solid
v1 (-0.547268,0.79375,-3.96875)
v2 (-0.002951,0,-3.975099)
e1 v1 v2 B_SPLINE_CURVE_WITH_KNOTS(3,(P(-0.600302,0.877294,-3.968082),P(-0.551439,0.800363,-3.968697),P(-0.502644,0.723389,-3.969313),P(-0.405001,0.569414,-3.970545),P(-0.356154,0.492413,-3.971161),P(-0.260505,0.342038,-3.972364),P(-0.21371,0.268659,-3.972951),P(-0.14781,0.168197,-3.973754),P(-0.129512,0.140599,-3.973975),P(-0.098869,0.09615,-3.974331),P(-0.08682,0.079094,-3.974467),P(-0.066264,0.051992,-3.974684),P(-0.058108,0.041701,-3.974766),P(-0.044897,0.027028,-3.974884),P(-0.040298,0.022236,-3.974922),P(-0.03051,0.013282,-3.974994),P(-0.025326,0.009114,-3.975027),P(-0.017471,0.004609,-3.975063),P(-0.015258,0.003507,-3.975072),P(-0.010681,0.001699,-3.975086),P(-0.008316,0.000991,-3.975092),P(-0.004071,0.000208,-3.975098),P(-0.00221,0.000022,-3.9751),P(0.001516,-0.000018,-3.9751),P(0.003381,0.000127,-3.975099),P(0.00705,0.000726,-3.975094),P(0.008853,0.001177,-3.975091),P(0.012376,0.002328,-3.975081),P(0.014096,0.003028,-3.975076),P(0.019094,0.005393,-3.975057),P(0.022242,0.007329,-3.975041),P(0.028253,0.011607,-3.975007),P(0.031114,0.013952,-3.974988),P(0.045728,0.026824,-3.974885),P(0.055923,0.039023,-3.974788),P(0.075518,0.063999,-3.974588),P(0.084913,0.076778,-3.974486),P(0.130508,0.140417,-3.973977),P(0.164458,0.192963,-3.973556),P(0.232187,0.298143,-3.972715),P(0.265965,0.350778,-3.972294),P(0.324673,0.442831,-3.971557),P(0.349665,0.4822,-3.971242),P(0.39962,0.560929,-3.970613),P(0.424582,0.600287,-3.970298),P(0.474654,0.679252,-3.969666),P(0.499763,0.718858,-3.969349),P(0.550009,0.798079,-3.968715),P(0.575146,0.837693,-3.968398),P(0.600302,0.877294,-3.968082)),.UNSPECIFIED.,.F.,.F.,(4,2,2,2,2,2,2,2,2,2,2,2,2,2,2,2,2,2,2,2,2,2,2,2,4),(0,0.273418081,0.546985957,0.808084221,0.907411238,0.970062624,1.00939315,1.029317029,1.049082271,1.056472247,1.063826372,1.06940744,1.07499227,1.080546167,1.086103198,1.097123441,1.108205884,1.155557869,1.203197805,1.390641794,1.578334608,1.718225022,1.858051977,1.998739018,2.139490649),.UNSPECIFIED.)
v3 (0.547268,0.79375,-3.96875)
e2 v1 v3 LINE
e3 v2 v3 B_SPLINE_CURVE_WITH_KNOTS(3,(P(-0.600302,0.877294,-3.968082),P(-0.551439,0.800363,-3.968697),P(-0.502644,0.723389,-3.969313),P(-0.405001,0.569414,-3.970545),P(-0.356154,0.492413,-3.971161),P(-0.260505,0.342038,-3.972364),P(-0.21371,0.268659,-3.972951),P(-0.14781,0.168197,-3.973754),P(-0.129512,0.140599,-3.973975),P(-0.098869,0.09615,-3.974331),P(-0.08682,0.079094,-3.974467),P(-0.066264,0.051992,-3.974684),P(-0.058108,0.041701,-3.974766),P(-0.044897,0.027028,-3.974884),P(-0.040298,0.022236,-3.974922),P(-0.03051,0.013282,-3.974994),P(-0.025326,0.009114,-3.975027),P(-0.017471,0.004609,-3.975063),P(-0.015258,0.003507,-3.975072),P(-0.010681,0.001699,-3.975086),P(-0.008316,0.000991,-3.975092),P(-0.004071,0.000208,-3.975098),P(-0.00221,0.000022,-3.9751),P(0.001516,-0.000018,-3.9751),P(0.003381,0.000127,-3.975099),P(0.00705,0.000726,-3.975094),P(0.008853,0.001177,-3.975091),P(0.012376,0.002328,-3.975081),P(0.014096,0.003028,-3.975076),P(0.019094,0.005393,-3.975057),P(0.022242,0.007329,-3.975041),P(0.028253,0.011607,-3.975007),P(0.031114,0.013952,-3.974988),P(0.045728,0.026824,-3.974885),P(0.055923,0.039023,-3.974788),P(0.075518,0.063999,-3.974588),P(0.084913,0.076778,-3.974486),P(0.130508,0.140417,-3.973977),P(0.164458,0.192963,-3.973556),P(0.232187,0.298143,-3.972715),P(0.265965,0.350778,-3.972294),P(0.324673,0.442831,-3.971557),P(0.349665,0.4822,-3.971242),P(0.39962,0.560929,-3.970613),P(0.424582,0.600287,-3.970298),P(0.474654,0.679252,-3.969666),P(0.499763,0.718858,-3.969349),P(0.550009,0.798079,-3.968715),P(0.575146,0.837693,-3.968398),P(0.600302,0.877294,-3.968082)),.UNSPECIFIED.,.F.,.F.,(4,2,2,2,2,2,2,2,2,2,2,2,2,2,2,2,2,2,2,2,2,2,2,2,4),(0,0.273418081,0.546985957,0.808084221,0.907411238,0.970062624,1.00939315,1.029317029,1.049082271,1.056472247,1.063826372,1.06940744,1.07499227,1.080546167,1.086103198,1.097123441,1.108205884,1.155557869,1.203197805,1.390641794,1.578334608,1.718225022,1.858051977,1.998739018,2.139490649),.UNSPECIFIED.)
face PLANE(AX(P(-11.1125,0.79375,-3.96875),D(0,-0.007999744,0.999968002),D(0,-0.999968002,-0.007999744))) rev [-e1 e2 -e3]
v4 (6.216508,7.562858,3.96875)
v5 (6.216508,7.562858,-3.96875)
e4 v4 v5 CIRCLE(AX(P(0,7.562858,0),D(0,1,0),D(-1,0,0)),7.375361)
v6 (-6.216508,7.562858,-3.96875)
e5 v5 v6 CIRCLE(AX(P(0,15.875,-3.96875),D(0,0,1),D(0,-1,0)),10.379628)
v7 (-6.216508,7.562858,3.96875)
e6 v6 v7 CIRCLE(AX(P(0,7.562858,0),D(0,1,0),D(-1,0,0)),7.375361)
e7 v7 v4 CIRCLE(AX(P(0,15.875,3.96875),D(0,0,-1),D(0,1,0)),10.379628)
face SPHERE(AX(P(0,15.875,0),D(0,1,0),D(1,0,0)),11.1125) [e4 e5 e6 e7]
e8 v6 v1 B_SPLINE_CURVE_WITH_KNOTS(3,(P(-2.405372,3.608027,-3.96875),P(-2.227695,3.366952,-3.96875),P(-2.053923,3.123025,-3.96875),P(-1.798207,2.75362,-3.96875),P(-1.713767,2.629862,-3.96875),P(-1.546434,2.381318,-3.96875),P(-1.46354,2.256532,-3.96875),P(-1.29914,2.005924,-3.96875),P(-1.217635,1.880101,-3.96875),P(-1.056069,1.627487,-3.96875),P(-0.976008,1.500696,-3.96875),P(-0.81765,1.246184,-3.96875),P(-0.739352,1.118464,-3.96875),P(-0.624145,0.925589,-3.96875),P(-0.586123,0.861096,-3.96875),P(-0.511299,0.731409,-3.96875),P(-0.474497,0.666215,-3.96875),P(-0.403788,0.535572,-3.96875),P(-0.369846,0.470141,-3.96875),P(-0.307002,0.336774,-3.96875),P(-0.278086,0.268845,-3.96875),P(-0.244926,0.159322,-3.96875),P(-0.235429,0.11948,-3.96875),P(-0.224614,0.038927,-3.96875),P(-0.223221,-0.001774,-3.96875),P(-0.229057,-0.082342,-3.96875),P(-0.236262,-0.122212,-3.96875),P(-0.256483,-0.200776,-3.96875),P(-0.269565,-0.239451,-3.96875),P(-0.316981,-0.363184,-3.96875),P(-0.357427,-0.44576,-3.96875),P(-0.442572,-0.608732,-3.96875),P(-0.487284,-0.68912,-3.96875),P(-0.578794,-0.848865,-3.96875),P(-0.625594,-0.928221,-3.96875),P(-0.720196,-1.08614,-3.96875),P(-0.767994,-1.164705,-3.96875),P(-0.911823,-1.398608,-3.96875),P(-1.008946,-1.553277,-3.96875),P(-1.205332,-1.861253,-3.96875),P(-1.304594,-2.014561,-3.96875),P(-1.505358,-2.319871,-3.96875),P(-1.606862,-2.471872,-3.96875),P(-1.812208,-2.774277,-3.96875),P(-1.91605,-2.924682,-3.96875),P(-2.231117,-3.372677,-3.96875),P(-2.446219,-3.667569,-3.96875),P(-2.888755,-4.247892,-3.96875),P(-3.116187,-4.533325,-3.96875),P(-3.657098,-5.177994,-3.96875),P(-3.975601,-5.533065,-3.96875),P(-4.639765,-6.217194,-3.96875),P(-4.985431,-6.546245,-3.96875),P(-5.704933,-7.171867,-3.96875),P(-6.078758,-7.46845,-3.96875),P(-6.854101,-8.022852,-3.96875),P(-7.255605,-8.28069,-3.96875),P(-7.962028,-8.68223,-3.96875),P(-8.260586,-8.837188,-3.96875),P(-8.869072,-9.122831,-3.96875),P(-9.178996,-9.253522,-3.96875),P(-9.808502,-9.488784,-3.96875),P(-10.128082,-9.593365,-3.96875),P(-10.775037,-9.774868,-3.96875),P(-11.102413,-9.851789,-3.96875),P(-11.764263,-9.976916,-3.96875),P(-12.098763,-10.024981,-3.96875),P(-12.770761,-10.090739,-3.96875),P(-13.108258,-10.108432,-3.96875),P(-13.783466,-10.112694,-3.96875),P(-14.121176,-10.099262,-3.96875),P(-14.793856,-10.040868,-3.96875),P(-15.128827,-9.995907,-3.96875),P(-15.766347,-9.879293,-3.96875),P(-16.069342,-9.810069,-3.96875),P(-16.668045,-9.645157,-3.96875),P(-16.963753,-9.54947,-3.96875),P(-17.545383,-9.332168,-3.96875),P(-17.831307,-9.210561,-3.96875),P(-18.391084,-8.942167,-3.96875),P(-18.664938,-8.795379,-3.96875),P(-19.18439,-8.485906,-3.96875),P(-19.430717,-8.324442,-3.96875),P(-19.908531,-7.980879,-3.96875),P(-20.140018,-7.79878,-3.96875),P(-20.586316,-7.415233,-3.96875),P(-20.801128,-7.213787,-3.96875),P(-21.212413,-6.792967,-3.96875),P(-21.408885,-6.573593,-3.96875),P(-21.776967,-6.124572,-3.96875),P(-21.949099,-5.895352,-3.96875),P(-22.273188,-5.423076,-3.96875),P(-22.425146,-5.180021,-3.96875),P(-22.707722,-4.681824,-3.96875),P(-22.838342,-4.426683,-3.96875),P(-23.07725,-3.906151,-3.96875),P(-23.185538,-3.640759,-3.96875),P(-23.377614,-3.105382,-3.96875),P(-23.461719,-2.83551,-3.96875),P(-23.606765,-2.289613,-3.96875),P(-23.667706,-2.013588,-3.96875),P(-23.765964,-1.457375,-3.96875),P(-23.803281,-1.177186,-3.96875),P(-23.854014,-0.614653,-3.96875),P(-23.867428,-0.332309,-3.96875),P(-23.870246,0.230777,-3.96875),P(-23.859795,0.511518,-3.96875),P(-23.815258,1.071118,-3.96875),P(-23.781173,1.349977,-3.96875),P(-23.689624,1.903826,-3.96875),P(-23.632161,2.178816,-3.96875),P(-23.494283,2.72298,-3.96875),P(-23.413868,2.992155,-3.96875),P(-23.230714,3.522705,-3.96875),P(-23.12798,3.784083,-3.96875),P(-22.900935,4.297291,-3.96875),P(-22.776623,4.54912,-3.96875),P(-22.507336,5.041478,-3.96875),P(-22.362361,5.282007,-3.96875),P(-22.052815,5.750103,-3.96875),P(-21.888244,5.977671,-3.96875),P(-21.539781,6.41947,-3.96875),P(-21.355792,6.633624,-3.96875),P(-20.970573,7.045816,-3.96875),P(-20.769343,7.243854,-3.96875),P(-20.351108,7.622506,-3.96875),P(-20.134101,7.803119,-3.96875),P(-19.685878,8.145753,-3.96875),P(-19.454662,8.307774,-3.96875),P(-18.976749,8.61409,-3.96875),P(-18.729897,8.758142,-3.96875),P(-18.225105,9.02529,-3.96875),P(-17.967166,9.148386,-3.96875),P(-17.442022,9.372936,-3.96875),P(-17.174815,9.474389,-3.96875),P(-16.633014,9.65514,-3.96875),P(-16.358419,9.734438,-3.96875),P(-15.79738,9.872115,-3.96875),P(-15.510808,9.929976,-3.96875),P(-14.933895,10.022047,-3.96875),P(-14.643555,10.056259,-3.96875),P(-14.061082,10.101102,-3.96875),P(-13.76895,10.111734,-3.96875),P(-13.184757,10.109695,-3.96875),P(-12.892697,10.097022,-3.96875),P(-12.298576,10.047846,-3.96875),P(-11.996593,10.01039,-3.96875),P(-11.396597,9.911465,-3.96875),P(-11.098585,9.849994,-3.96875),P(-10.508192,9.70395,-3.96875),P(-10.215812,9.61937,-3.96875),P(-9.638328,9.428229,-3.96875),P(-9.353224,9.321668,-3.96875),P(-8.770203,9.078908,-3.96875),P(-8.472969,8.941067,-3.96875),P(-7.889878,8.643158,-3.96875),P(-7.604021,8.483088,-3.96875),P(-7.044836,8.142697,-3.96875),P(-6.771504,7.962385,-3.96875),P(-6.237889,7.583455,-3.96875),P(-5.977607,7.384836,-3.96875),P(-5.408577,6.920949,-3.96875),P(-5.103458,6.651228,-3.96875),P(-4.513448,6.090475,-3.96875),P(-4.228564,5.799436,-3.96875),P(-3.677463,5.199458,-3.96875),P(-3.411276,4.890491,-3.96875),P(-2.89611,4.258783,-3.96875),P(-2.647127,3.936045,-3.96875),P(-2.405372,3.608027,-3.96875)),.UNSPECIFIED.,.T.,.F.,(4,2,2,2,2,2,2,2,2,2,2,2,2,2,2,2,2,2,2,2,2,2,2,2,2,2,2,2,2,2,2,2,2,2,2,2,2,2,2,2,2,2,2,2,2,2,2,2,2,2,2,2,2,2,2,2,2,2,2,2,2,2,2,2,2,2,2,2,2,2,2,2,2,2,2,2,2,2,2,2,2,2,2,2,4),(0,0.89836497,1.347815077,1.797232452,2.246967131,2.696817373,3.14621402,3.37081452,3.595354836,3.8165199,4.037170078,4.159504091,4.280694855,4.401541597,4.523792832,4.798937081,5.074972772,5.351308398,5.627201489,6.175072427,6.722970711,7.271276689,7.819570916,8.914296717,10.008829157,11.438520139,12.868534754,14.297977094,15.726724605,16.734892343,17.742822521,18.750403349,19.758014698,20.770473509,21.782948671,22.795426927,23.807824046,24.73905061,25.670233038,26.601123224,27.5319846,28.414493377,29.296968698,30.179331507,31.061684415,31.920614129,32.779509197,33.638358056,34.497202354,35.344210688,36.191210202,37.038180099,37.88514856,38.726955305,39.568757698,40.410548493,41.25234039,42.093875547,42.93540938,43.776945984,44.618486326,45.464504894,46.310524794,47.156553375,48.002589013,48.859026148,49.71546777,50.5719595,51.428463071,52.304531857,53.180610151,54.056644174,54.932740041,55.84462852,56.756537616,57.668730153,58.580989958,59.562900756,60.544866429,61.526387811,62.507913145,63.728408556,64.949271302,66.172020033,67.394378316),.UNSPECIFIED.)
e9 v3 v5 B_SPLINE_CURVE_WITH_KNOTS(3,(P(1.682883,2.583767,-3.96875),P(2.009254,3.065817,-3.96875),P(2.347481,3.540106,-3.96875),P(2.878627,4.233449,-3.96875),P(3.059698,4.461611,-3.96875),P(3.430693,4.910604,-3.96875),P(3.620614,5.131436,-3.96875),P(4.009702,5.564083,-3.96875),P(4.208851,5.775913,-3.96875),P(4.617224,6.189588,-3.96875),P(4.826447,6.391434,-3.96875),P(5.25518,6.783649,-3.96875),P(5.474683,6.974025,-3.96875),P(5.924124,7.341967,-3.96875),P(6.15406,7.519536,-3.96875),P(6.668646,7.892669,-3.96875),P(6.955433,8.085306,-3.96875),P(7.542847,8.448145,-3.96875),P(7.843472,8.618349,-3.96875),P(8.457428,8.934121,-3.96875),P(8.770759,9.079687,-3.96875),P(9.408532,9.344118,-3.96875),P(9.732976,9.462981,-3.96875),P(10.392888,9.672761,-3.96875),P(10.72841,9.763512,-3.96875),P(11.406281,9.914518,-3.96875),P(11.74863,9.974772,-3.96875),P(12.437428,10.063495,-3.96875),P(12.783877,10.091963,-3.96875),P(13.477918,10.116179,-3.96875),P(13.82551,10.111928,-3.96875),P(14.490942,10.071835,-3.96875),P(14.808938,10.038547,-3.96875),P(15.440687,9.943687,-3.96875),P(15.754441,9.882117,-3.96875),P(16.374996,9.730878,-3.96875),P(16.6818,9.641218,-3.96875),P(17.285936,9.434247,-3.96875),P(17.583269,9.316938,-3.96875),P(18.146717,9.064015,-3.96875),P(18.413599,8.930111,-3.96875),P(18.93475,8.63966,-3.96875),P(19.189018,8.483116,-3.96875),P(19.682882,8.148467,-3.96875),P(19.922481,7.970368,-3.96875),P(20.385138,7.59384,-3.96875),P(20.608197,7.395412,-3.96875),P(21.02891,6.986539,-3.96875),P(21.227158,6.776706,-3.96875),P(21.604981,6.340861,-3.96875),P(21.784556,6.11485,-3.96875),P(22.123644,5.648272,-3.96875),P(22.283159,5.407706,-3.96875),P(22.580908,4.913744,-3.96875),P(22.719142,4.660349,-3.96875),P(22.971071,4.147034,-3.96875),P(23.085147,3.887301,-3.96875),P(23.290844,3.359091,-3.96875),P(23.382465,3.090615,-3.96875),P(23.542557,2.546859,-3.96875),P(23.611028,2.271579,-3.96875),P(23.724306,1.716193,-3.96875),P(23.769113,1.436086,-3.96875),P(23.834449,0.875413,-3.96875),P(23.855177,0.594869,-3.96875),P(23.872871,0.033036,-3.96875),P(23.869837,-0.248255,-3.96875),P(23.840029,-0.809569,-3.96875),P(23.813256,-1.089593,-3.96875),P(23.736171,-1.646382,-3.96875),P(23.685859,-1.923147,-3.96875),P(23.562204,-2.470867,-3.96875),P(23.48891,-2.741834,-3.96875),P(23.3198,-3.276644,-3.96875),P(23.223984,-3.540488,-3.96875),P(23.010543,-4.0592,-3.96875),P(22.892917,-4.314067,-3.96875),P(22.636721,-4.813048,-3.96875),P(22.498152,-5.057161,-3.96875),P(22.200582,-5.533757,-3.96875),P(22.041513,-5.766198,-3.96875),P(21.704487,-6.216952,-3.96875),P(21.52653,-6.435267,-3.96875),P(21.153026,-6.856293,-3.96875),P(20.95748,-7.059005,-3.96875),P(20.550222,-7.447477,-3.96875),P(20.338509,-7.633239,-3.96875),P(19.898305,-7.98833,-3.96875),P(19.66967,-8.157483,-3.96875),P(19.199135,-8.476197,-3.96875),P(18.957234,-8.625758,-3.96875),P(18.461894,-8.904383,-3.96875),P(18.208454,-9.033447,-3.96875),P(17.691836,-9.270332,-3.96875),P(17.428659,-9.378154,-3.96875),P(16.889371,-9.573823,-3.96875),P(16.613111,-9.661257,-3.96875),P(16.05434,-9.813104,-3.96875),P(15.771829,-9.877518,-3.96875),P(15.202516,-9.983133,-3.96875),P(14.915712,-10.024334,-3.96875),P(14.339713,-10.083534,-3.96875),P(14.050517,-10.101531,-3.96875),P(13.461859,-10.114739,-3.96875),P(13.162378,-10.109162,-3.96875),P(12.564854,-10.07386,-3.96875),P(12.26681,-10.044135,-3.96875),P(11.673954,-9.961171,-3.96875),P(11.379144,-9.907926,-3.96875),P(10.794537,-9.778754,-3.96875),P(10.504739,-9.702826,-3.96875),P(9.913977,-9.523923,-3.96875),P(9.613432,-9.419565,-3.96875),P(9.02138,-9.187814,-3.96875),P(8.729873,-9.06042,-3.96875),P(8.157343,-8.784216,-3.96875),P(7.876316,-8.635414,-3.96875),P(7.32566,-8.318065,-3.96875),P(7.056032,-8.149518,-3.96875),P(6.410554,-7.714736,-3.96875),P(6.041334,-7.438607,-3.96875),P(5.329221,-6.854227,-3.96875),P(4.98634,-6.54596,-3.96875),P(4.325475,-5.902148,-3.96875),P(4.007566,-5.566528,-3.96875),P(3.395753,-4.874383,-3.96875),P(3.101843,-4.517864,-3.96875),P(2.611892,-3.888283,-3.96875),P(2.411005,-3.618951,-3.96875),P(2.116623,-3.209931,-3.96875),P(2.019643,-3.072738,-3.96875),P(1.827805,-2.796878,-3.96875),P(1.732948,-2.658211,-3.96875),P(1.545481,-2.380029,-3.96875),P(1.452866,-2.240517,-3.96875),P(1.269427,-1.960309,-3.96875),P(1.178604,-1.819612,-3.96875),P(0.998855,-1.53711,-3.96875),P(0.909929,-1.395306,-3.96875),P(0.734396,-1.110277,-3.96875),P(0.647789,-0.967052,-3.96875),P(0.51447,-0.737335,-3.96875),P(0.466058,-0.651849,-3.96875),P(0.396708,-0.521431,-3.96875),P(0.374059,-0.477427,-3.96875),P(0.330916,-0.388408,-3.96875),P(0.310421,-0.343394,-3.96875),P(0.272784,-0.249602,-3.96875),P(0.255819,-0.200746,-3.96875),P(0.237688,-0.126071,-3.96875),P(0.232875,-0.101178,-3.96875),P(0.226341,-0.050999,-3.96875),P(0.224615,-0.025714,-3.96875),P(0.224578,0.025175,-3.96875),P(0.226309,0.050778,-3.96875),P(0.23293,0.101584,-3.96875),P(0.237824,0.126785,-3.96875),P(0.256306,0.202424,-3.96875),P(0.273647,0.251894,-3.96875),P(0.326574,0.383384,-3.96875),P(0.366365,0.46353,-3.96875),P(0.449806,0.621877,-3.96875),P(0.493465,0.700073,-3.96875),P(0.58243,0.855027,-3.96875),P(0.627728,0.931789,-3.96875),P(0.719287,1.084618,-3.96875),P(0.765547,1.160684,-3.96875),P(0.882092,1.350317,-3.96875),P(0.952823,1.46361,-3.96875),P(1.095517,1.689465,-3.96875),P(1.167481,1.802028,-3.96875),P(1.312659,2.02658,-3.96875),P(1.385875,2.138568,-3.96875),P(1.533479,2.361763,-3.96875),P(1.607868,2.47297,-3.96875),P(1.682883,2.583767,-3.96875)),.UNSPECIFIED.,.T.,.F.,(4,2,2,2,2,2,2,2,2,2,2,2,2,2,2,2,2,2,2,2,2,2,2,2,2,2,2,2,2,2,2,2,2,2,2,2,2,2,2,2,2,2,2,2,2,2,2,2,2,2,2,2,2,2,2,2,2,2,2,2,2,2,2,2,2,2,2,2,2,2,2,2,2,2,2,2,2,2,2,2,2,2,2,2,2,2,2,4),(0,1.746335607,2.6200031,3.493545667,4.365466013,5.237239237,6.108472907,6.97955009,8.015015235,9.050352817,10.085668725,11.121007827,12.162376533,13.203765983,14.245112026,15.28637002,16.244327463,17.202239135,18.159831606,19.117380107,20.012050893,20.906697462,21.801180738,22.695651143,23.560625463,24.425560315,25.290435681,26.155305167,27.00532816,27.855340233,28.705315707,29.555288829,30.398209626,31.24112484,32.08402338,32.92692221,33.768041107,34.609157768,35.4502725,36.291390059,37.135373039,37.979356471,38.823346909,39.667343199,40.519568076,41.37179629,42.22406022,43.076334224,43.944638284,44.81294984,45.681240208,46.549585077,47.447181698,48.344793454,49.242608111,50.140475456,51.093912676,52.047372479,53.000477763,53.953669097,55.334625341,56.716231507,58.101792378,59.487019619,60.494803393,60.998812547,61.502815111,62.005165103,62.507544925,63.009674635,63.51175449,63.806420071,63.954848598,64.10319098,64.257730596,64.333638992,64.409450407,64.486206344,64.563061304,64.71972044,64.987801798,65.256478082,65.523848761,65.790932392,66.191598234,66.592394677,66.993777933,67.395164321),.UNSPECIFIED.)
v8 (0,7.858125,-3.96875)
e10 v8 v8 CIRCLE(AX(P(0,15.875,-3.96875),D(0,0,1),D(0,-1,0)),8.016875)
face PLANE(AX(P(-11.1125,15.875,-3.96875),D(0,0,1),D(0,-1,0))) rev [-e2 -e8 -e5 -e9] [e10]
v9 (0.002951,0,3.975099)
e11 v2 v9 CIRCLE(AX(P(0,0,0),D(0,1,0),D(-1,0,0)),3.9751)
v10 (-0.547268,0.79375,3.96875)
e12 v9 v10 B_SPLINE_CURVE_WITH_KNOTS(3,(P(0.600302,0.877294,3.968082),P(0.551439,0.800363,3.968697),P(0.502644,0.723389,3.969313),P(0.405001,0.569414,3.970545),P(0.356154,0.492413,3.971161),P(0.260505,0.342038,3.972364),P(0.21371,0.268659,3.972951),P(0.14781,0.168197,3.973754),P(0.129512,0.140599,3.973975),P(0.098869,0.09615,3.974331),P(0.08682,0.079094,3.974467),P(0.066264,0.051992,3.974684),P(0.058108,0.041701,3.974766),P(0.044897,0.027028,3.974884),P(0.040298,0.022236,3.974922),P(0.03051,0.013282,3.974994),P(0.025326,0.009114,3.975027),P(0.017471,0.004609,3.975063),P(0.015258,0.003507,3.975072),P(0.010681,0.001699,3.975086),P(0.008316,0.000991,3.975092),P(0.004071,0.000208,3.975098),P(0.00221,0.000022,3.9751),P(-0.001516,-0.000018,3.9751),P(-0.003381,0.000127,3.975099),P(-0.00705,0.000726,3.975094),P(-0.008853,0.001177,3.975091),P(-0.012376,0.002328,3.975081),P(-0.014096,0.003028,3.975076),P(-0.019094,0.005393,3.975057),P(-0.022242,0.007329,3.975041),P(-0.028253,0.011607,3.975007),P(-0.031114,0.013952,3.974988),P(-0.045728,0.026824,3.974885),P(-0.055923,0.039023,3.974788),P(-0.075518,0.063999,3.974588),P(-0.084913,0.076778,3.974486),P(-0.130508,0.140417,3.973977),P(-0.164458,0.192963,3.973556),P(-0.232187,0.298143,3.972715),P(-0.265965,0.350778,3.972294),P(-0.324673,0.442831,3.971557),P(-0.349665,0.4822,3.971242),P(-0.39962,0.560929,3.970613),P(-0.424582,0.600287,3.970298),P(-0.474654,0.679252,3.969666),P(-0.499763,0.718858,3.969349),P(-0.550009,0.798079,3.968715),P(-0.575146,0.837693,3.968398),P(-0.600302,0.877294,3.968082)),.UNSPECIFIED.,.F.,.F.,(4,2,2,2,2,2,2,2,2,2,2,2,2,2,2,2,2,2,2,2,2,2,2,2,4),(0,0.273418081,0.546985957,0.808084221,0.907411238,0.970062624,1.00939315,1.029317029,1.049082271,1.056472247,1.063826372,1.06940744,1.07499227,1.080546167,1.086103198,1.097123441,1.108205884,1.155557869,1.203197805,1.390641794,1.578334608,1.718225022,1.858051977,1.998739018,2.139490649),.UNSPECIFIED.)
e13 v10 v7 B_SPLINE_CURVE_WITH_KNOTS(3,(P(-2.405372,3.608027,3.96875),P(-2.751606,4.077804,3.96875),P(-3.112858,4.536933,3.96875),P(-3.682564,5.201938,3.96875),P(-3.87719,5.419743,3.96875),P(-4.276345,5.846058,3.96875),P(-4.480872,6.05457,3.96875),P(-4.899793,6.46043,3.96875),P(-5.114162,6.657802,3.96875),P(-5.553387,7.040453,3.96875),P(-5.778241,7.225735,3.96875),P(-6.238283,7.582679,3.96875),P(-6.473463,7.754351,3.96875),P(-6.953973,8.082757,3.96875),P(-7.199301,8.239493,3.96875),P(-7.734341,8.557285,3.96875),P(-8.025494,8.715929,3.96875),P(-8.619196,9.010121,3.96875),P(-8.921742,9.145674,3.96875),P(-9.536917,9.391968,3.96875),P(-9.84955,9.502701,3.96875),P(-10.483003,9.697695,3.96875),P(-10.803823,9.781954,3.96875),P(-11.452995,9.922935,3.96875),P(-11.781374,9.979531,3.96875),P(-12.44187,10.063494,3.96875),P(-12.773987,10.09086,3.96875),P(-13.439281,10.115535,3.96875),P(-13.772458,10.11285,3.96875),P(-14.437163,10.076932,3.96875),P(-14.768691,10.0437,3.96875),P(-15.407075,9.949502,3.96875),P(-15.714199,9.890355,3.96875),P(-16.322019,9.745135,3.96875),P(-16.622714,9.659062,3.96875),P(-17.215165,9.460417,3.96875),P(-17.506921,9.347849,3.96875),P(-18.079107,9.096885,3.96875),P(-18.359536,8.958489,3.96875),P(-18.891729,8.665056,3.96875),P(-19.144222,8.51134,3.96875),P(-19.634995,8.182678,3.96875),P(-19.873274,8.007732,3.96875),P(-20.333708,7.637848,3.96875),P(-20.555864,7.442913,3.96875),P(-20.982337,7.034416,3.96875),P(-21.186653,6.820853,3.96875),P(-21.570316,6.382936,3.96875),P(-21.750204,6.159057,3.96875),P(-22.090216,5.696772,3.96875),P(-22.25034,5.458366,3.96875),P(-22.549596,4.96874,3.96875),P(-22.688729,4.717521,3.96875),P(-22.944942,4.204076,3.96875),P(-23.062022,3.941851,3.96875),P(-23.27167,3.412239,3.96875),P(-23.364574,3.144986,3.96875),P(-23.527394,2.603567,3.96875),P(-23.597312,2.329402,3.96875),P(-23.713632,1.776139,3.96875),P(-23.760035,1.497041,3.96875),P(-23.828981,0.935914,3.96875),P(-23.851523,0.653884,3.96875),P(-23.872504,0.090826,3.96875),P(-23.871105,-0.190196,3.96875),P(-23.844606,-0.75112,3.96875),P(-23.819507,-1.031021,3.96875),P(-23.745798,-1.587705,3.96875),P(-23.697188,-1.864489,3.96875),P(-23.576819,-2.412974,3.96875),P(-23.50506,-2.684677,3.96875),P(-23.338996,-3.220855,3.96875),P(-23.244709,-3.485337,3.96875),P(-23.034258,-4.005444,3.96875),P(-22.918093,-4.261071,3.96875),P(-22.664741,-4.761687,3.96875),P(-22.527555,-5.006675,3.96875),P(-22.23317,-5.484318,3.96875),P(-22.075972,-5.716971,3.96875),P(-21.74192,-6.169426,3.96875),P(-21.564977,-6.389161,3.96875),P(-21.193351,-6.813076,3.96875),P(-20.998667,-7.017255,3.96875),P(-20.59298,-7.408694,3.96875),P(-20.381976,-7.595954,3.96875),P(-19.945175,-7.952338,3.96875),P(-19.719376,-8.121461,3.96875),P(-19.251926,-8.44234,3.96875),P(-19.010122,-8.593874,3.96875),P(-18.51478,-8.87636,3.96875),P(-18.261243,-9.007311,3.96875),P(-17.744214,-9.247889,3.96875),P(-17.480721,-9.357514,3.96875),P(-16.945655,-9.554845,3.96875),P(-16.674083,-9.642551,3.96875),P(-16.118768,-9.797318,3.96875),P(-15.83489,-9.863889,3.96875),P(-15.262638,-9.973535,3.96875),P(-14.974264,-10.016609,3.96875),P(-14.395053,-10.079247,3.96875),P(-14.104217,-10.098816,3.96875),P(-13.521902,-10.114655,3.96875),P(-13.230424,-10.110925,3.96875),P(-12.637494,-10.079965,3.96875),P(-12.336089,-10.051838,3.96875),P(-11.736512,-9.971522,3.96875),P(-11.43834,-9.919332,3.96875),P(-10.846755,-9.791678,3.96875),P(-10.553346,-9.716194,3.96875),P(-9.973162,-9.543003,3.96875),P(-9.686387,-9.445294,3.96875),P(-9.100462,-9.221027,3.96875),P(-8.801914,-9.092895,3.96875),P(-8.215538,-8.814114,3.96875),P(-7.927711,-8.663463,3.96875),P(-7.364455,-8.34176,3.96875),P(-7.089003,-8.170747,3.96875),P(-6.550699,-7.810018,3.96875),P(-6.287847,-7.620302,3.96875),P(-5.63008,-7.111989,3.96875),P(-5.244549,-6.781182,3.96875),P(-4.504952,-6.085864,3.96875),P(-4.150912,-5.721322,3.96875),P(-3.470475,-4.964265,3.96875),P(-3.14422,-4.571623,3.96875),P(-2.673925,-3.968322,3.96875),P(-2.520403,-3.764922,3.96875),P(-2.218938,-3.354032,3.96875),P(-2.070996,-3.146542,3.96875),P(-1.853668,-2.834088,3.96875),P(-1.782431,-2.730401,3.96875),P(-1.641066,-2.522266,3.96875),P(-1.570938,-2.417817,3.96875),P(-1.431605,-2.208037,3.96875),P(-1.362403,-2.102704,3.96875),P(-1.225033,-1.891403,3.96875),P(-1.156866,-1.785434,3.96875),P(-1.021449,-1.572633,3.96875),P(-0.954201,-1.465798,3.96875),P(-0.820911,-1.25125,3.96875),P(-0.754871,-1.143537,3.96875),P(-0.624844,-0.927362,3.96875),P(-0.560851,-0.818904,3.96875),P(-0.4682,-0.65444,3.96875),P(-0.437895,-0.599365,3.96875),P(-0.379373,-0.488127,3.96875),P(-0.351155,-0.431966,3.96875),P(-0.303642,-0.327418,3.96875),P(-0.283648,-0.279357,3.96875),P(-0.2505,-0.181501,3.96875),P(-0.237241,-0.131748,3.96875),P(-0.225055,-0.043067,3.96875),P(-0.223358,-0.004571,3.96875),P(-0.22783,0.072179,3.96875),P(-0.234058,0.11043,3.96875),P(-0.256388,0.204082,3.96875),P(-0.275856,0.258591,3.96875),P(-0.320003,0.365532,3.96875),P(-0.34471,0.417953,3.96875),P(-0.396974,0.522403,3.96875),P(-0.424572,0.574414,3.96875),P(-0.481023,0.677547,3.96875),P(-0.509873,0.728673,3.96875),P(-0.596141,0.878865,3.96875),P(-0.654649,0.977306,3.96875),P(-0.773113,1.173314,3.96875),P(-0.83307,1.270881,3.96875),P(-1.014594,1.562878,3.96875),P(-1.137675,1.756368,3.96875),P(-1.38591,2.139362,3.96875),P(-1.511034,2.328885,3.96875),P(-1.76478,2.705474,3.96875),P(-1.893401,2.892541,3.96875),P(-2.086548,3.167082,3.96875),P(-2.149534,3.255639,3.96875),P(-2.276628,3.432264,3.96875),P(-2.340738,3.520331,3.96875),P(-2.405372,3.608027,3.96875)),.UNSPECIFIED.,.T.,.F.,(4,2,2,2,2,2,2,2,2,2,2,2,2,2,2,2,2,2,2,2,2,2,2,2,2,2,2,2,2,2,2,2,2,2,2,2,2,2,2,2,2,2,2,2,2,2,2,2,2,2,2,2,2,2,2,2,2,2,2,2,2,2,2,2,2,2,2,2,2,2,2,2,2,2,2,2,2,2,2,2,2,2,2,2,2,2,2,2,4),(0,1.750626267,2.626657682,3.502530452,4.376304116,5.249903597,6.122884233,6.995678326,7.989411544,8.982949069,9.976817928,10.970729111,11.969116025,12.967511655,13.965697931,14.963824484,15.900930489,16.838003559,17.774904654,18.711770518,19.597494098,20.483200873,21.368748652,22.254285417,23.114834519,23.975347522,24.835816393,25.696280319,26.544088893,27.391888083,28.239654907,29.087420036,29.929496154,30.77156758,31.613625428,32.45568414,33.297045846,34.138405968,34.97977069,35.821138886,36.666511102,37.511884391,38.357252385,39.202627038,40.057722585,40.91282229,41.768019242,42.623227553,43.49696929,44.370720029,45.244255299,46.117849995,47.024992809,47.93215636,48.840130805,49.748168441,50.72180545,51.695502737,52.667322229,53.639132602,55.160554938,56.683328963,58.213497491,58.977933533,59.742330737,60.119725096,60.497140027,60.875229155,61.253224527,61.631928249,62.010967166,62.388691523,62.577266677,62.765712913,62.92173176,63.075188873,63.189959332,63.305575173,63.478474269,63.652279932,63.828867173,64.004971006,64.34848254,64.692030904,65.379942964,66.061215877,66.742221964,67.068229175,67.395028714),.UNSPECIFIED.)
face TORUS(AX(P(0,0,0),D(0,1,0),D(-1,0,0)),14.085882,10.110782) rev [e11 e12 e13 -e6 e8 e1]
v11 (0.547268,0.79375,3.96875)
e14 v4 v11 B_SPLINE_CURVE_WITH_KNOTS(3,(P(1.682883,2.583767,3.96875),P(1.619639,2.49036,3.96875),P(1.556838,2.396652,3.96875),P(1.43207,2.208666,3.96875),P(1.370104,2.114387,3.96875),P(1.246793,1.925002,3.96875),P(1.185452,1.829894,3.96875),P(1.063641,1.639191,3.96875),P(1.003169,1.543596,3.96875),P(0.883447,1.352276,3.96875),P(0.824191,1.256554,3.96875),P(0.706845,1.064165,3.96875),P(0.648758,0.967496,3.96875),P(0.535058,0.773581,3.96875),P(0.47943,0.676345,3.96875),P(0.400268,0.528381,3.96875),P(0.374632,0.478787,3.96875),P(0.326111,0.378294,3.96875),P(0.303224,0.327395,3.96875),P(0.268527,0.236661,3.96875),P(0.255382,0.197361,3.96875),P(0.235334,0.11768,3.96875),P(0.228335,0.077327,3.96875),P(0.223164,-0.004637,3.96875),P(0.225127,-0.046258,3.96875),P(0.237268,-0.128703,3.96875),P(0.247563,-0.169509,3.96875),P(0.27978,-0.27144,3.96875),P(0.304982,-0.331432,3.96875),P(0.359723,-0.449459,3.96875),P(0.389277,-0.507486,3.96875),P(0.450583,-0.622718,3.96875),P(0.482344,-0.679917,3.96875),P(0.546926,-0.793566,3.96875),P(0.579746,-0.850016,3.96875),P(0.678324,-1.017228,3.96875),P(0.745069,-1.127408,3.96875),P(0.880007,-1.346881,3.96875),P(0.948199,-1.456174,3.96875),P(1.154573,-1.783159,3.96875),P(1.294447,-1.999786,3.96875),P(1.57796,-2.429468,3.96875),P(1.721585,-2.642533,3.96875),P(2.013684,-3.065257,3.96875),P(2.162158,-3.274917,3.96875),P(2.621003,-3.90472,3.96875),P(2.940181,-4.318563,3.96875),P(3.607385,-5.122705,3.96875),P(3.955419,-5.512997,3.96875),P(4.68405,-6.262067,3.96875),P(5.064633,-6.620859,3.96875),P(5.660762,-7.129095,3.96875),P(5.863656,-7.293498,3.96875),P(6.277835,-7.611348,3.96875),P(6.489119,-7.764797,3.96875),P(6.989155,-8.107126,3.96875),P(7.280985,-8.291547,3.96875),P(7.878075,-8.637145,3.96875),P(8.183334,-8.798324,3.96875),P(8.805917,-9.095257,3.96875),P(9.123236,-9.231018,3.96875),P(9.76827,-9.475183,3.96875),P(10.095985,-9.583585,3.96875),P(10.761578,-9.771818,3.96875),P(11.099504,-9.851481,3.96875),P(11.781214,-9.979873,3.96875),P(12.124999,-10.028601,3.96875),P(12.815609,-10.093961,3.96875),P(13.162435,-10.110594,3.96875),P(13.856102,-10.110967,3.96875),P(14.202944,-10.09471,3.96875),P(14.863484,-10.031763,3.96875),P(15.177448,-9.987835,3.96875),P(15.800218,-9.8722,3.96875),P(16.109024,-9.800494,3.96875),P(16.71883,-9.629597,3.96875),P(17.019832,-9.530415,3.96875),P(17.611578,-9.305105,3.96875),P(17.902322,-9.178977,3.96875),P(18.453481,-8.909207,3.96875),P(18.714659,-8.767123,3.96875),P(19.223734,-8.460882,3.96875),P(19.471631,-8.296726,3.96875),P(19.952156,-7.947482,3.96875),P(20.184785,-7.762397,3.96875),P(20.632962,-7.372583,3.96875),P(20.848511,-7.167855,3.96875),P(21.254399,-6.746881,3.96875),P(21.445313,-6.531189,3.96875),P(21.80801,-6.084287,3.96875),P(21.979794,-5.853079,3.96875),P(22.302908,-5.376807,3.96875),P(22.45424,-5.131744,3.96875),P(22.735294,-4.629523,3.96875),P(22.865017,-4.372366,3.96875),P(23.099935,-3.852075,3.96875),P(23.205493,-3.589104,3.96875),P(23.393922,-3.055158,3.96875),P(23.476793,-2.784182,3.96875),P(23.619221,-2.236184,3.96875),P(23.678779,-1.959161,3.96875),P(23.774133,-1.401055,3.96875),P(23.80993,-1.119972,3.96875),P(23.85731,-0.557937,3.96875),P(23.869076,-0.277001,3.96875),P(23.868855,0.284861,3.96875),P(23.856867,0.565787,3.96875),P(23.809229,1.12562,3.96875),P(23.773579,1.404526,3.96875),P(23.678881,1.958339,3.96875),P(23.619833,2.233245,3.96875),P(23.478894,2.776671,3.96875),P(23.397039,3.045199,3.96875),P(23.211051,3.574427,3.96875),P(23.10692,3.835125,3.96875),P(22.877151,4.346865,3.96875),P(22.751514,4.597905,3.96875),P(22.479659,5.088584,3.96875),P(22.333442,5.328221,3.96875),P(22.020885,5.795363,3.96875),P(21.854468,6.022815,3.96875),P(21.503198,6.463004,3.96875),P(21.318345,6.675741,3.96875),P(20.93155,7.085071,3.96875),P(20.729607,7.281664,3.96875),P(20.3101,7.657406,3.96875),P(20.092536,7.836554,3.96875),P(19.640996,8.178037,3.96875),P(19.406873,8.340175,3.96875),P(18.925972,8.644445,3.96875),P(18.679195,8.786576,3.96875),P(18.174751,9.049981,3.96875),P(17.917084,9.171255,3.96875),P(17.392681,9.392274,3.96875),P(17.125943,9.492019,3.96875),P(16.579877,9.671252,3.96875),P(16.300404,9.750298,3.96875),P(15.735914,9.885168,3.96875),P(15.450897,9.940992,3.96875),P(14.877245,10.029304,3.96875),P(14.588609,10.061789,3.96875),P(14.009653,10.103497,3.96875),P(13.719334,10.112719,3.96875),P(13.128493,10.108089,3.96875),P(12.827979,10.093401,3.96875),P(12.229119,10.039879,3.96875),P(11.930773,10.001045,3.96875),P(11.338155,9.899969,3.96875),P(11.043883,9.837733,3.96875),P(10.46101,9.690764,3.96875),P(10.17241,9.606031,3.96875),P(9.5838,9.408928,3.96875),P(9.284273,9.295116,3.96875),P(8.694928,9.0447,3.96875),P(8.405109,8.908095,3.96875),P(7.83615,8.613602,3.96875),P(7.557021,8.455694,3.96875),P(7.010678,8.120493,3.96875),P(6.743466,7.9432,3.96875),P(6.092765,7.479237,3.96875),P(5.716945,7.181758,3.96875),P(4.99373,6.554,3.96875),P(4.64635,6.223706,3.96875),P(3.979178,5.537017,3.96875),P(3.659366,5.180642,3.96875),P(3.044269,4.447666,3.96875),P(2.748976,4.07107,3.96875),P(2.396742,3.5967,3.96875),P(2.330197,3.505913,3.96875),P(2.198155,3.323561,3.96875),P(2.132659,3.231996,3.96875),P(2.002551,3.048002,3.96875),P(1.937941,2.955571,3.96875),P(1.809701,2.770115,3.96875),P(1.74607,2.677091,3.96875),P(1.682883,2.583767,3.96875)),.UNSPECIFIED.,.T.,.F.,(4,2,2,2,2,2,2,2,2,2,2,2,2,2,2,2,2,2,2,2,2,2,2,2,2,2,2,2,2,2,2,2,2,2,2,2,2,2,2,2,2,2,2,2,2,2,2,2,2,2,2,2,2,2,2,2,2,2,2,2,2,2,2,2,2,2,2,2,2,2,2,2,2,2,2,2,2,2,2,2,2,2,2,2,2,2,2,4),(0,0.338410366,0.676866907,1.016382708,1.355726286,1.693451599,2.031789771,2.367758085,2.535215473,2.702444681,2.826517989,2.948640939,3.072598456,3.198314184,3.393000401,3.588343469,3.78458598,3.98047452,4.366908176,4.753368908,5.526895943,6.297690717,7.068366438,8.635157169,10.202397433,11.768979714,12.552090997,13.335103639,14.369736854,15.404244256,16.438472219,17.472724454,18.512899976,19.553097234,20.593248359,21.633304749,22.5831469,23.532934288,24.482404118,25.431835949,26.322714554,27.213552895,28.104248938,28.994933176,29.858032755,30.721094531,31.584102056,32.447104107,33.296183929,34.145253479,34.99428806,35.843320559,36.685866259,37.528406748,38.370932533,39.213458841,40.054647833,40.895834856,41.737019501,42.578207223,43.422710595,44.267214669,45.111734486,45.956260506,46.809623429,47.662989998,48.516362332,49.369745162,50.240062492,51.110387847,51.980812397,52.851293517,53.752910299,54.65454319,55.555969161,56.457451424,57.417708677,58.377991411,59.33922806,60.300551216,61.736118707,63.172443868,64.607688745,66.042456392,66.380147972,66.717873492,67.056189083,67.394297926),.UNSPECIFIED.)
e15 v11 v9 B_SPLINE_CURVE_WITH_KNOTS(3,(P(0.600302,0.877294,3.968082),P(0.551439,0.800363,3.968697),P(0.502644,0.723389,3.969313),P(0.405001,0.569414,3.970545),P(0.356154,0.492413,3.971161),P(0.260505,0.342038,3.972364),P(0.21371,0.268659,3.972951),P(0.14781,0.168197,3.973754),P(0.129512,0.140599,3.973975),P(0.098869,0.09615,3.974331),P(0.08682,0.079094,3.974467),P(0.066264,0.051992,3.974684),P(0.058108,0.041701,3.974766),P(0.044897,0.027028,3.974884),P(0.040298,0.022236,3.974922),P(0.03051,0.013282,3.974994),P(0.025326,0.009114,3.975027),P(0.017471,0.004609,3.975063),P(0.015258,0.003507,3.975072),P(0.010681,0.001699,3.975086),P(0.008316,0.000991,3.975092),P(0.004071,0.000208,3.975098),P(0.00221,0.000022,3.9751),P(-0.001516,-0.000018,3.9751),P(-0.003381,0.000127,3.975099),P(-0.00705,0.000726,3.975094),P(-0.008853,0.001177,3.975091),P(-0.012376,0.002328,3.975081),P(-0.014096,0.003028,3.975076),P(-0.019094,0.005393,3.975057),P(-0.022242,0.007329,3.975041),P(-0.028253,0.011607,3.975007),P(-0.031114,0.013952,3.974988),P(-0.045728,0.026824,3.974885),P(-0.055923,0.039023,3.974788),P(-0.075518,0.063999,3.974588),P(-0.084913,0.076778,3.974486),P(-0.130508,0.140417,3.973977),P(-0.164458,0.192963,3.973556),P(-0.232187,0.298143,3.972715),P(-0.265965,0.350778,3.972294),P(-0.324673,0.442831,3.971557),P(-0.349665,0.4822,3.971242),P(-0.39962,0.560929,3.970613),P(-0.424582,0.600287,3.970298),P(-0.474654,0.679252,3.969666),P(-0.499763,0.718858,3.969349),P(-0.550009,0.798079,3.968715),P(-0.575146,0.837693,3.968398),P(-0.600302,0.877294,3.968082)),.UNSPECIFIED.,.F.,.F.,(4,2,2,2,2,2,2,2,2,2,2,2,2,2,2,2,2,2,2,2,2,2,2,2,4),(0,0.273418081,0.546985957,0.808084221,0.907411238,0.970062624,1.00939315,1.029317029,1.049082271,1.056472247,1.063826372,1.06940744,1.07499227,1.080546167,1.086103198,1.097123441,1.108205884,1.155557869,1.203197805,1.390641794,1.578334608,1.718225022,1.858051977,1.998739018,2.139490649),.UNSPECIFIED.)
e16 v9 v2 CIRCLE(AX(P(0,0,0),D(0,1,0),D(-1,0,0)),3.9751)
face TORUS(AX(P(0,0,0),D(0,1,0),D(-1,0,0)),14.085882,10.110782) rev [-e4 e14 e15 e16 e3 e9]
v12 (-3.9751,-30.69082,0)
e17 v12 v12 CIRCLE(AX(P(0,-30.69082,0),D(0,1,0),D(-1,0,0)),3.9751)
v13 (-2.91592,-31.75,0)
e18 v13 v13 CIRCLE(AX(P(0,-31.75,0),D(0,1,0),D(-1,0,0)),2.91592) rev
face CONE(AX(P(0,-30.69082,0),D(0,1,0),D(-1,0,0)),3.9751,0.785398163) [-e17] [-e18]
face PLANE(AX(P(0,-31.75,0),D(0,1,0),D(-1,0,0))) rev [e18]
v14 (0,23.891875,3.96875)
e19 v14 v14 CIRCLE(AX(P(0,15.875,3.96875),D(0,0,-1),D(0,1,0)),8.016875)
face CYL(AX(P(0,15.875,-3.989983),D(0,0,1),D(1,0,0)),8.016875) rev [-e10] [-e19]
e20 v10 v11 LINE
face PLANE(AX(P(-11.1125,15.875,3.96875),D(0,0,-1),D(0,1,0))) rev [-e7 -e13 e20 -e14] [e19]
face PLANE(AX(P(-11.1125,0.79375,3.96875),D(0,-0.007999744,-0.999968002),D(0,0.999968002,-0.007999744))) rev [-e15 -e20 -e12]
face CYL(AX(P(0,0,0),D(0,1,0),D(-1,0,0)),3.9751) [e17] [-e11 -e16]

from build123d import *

# Parameters (mm, degrees)
SKETCH14_W              = 3.9751
SKETCH14_H              = 31.75
CUT_EXTRUDE10_START     = -10.379628209
CUT_EXTRUDE10_DEPTH     = 20.759256418
CUT_EXTRUDE9_DEPTH      = 34.872578542
CUT_EXTRUDE9_DEPTH_BACK = 34.872578542
SKETCH17_R              = 8.016875
CUT_EXTRUDE4_DEPTH      = 35.562321428
CUT_EXTRUDE4_DEPTH_BACK = 35.562321428
SKETCH10_R              = 3.96875
CUT_EXTRUDE7_START      = -5.55625
SKETCH22_W              = 22.225
SKETCH22_H              = 26.9875
CUT_EXTRUDE7_DEPTH      = 30.006071428
CUT_EXTRUDE8_START      = 5.55625
SKETCH23_W              = 22.225
SKETCH23_H              = 26.9875
CUT_EXTRUDE8_DEPTH      = 30.006071428
CHAMFER1_SIZE           = 1.05918
CHAMFER2_SIZE           = 0.396875


# Read off the part's stored shape, not the designer's step: Cut-Extrude10
with BuildPart() as part:
    # Sketch14 → Revolve4 (revolve)
    with BuildSketch(Plane.XY, mode=Mode.PRIVATE) as revolve4_sk:
        with Locations((1.98755, -15.875)):
            Rectangle(SKETCH14_W, SKETCH14_H)
    revolve(revolve4_sk.sketch.rotate(Axis((0, 0, 0), (0, -1, 0)), 180), axis=Axis((0, 0, 0), (0, -1, 0)))

    # Chamfer1
    chamfer1_edges = [part.edges().sort_by_distance(p)[0] for p in [
        (3.9751, -31.75, 0),
    ]]
    chamfer(chamfer1_edges, length=CHAMFER1_SIZE)


with BuildPart() as body_2:
    # Sketch21 → Revolve5 (revolve)
    with BuildSketch(Plane.XY):
        with BuildLine():
            Line((0, 26.9875), (0, 0))
            Line((0, 0), (3.9751, 0))
            ThreePointArc((3.9751, 0), (4.86426259, 4.14604002), (7.37536085, 7.562857762))
            ThreePointArc((7.37536085, 7.562857762), (10.388848273, 19.819551662), (0, 26.9875))
        make_face()
    revolve(axis=Axis((0, 0, 0), (0, -1, 0)))

    # Cut-Extrude10 outline → Cut-Extrude10 (cut)
    with BuildSketch(Plane(origin=(0, 0, 0), x_dir=(0, 0, -1), z_dir=(1, 0, 0)).offset(CUT_EXTRUDE10_START)):
        Polygon((-3.9911, -2), (-3.96875, 0.79375), (-3.96875, 28), (-12, 28), (-12, -2), align=None)
        Polygon((3.96875, 0.79375), (3.9911, -2), (12, -2), (12, 28), (3.96875, 28), align=None)
    extrude(amount=CUT_EXTRUDE10_DEPTH, mode=Mode.SUBTRACT)

    # Sketch17 → Cut-Extrude9 (cut, two sides: drawn at the far end of the back side and taken through both)
    with BuildSketch(Plane.XY.offset(-CUT_EXTRUDE9_DEPTH_BACK)):
        with Locations(Location((0, 15.875, 0), (0, 0, 270))):
            Circle(SKETCH17_R)
    extrude(amount=CUT_EXTRUDE9_DEPTH + CUT_EXTRUDE9_DEPTH_BACK, mode=Mode.SUBTRACT)

    # Combine2: union part
    add(part.part)


with BuildPart() as body_3:
    # Sketch7 → Revolve3 (revolve)
    with BuildSketch(Plane.XY):
        with BuildLine():
            Line((0, 23.8125), (0, 7.9375))
            ThreePointArc((0, 7.9375), (7.9375, 15.875), (0, 23.8125))
        make_face()
    revolve(axis=Axis((0, 0, 0), (0, 1, 0)))

    # Sketch10 → Cut-Extrude4 (cut, two sides: drawn at the far end of the back side and taken through both)
    with BuildSketch(Plane.XY.offset(-CUT_EXTRUDE4_DEPTH_BACK)):
        with Locations(Location((0, 15.875, 0), (0, 0, 180))):
            Circle(SKETCH10_R)
    extrude(amount=CUT_EXTRUDE4_DEPTH + CUT_EXTRUDE4_DEPTH_BACK, mode=Mode.SUBTRACT)

    # Sketch22 → Cut-Extrude7 (cut, through all)
    with BuildSketch(Plane.XY.offset(CUT_EXTRUDE7_START)):
        with Locations((0, 13.49375)):
            Rectangle(SKETCH22_W, SKETCH22_H)
    extrude(amount=-CUT_EXTRUDE7_DEPTH, mode=Mode.SUBTRACT)

    # Sketch23 → Cut-Extrude8 (cut, through all)
    with BuildSketch(Plane.XY.offset(CUT_EXTRUDE8_START)):
        with Locations((0, 13.49375)):
            Rectangle(SKETCH23_W, SKETCH23_H)
    extrude(amount=CUT_EXTRUDE8_DEPTH, mode=Mode.SUBTRACT)

    # Chamfer2
    chamfer2_edges = [body_3.edges().sort_by_distance(p)[0] for p in [
        (3.96875, 15.875, -5.55625),
        (3.96875, 15.875, 5.55625),
    ]]
    chamfer(chamfer2_edges, length=CHAMFER2_SIZE)


solid = body_2.part
